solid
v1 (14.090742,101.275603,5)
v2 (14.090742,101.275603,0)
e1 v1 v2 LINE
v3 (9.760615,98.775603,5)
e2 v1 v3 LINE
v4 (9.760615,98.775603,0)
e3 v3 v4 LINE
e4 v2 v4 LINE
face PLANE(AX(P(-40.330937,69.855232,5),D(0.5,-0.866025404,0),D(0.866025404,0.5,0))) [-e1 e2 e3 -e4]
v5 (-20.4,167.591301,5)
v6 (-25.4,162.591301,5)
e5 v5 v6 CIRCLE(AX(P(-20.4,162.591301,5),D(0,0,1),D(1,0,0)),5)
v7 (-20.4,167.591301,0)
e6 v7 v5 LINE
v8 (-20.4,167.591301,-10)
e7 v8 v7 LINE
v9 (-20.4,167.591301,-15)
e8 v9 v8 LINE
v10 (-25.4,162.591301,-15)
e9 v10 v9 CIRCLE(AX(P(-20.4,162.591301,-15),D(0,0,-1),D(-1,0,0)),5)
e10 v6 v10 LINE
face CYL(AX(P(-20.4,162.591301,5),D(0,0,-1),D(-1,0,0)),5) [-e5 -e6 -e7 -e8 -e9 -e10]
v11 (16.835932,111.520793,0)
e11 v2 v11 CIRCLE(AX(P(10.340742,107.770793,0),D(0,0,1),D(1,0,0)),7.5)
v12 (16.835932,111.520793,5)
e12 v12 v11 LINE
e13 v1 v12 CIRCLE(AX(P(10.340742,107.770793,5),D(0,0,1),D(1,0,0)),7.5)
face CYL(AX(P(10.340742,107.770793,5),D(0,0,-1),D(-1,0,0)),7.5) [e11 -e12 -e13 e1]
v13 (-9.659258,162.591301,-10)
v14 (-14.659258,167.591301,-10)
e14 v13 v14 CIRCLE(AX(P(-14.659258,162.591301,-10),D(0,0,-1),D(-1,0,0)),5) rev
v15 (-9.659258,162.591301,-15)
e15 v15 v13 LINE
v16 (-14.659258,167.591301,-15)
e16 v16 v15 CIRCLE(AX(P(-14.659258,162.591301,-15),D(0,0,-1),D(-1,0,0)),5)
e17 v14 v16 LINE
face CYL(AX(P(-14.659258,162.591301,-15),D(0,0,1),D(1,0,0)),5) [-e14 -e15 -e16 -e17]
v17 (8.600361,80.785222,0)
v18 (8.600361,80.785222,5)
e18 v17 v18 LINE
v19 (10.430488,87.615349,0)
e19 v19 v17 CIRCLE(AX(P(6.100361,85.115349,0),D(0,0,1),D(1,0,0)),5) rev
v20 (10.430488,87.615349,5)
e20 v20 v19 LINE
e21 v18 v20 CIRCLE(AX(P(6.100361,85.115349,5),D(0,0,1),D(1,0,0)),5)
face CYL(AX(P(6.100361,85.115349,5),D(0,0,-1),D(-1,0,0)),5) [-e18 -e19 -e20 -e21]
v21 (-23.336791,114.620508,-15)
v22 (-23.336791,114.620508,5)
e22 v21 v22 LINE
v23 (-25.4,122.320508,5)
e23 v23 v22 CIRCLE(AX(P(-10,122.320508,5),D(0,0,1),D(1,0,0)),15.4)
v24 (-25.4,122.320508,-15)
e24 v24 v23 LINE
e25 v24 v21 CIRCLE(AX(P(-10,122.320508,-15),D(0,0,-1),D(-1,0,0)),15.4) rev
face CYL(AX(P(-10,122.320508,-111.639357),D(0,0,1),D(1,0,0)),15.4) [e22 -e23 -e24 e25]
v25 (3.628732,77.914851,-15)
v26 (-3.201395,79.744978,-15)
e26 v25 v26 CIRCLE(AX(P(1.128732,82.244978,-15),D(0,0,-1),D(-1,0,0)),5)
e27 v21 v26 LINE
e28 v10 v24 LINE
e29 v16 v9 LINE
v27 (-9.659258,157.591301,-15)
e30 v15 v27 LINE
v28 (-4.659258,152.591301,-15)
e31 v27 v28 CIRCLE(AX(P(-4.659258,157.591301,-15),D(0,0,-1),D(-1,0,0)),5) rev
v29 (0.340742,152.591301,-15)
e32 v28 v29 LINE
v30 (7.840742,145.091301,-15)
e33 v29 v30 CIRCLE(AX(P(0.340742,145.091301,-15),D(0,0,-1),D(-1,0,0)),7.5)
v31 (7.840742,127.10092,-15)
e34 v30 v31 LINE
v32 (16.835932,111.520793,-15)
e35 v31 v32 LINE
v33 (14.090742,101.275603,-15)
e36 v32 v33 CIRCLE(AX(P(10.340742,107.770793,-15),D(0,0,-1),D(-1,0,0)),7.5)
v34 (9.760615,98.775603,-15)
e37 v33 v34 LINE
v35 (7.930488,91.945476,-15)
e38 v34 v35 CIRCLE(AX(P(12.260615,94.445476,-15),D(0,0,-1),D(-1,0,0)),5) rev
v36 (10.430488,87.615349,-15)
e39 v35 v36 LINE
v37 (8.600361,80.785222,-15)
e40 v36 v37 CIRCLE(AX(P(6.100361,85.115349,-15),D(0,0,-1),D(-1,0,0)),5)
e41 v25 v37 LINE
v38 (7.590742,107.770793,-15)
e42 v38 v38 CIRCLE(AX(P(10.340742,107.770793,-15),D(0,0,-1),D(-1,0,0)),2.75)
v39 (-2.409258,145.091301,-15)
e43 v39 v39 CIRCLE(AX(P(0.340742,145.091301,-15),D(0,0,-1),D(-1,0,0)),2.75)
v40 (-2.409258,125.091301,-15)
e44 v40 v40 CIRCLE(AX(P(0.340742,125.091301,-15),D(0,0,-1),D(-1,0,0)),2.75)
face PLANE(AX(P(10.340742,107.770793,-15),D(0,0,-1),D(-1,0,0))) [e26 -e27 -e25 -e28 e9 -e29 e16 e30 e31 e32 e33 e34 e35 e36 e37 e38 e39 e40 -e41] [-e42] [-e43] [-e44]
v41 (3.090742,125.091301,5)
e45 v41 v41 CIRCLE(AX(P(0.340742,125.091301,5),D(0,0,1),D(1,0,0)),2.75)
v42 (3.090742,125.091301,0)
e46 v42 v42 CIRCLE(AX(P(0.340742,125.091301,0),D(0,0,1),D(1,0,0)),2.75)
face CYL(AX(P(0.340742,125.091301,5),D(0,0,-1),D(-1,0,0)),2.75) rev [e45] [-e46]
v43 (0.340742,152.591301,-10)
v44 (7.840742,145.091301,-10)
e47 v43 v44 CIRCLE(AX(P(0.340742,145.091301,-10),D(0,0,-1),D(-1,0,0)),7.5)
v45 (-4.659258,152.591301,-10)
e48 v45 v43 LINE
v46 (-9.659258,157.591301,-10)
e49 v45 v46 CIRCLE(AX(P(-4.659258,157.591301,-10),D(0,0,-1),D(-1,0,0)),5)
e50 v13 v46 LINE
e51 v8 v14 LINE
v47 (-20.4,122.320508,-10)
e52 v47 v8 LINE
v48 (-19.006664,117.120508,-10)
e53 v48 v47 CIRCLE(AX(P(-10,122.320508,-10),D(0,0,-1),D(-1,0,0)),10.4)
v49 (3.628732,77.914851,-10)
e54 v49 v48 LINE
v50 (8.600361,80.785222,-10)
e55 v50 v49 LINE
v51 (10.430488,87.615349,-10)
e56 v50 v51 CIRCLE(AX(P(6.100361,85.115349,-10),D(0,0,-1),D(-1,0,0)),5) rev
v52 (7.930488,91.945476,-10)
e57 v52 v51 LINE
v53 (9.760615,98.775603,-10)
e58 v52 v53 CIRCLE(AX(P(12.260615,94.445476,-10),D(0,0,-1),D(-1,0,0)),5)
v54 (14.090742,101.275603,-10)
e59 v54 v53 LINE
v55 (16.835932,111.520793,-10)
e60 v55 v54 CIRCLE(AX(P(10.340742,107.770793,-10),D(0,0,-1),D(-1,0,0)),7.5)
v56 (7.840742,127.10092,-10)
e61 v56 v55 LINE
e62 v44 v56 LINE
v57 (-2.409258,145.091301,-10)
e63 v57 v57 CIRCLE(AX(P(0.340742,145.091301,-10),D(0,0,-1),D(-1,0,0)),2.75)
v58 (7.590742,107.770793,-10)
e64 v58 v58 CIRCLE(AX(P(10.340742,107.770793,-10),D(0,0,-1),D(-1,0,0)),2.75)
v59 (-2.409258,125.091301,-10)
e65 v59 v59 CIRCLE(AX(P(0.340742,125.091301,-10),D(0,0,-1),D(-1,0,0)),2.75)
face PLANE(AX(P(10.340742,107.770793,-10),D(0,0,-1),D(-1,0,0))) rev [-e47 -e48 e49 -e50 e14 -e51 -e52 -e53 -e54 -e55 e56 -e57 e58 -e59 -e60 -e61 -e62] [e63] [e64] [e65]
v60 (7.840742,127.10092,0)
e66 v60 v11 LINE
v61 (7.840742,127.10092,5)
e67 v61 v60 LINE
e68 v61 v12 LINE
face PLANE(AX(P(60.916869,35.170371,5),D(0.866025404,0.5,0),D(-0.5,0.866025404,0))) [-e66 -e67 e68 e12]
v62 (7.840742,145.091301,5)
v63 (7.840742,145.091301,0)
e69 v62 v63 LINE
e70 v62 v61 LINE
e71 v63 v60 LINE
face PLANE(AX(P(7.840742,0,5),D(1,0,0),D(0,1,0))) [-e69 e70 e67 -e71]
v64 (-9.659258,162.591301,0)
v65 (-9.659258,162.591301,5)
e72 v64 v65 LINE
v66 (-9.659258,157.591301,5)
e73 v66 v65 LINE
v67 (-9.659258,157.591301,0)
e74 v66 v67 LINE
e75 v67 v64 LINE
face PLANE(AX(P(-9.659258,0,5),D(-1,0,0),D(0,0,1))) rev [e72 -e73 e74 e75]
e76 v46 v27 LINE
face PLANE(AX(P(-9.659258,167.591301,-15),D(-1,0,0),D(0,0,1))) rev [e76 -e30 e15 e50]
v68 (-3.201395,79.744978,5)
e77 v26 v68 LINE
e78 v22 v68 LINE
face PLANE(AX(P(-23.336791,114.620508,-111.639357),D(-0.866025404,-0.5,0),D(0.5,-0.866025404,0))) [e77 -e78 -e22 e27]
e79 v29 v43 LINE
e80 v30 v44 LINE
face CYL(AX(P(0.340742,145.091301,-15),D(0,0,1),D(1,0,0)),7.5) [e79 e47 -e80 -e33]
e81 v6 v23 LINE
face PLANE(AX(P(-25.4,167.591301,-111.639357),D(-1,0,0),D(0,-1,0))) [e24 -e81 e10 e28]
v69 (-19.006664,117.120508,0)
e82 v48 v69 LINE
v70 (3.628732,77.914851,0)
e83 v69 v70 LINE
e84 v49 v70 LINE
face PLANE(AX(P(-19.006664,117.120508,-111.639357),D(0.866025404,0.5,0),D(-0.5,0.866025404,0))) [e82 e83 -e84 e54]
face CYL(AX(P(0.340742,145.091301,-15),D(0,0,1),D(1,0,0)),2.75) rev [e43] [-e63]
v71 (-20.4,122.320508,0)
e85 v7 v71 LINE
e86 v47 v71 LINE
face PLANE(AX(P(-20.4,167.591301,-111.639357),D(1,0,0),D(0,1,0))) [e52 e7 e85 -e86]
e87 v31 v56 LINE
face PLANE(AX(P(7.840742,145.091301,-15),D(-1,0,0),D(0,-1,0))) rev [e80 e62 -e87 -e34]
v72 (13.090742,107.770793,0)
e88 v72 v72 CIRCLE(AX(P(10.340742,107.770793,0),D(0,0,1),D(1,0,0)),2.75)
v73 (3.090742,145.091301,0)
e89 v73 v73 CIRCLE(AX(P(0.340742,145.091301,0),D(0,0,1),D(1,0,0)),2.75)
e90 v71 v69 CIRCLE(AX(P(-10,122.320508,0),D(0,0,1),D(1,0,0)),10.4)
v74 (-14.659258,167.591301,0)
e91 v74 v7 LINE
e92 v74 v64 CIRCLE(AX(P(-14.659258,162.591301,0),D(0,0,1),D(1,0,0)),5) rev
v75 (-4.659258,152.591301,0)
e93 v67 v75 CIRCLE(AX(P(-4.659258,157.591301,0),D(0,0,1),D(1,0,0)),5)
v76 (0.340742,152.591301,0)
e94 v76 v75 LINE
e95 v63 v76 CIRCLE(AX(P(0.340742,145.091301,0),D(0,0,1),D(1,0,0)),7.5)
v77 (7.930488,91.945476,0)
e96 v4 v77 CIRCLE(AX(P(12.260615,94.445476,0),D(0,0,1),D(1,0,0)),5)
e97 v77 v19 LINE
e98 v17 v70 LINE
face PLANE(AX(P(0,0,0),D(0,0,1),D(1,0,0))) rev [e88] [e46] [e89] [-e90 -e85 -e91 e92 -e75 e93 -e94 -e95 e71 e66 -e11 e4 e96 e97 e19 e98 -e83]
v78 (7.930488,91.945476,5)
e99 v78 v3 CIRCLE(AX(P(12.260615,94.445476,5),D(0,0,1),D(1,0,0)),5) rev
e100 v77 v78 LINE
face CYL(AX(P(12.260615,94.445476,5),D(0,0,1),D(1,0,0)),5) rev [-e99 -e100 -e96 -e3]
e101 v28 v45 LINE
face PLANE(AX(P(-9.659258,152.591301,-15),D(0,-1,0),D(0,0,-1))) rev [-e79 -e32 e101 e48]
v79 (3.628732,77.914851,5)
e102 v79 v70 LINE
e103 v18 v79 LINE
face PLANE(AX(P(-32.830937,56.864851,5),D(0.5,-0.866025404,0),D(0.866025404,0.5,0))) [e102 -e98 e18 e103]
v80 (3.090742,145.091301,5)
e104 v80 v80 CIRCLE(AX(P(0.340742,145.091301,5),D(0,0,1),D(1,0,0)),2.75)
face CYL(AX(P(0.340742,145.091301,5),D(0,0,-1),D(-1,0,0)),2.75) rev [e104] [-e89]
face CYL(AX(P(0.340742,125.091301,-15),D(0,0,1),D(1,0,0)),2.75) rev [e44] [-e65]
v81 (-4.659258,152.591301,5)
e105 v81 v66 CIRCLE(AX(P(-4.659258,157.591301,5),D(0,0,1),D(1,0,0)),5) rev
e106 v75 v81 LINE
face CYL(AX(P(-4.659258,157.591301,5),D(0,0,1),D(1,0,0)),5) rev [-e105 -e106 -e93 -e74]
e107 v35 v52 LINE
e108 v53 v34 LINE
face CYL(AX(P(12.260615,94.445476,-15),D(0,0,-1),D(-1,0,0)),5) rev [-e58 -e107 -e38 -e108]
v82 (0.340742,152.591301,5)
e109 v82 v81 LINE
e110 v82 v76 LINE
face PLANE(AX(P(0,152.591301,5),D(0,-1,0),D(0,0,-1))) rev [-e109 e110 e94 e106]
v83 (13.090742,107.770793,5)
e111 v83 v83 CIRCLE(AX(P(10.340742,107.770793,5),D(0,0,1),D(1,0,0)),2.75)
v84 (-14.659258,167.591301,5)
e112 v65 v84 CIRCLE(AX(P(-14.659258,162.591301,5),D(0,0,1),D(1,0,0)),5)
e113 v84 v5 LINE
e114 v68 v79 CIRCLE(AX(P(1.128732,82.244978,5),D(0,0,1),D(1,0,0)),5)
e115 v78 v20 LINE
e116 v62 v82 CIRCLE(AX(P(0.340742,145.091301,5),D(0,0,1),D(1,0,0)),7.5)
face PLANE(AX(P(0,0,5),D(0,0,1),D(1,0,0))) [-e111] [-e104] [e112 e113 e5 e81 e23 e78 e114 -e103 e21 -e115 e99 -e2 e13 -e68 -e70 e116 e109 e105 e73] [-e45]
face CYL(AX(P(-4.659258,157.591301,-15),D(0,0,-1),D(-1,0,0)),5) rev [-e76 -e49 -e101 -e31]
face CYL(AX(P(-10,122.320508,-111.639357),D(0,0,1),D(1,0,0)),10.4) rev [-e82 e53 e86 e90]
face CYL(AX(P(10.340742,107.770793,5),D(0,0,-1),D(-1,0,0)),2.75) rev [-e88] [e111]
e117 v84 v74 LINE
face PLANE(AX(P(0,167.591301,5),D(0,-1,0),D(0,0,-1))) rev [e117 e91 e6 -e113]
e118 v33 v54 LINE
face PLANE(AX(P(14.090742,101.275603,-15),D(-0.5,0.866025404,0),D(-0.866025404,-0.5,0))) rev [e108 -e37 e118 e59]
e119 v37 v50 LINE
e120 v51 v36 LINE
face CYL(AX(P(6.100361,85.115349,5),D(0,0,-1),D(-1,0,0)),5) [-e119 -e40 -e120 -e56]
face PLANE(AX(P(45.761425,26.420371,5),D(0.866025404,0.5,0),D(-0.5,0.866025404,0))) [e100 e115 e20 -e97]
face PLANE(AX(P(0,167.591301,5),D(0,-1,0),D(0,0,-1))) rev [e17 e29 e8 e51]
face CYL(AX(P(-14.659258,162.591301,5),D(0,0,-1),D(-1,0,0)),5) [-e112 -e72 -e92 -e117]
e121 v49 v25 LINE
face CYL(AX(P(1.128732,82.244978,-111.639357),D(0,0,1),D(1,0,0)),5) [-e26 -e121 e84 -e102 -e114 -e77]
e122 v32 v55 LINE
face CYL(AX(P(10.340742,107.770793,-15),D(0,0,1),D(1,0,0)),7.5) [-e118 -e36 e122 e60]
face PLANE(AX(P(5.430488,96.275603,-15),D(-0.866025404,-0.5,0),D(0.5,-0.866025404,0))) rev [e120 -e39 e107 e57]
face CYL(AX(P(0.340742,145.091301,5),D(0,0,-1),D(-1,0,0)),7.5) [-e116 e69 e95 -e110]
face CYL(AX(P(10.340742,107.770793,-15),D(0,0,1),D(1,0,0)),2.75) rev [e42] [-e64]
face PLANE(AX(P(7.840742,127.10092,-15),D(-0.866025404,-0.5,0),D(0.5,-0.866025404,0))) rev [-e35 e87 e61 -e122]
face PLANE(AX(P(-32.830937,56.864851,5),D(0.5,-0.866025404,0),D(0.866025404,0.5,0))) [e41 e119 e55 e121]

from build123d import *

# Parameters (mm, degrees)
SKETCH1_R           = 2.75
BOSS_EXTRUDE1_DEPTH = 5
SKETCH2_R           = 2.75
BOSS_EXTRUDE2_DEPTH = 5
BOSS_EXTRUDE3_START = -20
BOSS_EXTRUDE3_DEPTH = 20
FILLET1_R           = 5


with BuildPart() as part:
    # Sketch1 → Boss-Extrude1 (new body)
    with BuildSketch(Plane.XY):
        with BuildLine():
            ThreePointArc((7.840741737, 145.091301473), (5.644042596, 150.394602332), (0.340741737, 152.591301473))
            Line((0.340741737, 152.591301473), (-9.659258263, 152.591301473))
            Line((-9.659258263, 152.591301473), (-9.659258263, 167.591301473))
            Line((-9.659258263, 167.591301473), (-20.400000003, 167.591301473))
            Line((-20.400000003, 167.591301473), (-20.4, 122.320508076))
            ThreePointArc((-20.4, 122.320508076), (-20.045628593, 119.628790007), (-19.006664199, 117.120508076))
            Line((-19.006664199, 117.120508076), (3.628732497, 77.914850942))
            Line((3.628732497, 77.914850942), (12.930487699, 83.285221812))
            Line((12.930487699, 83.285221812), (5.430487699, 96.275602869))
            Line((5.430487699, 96.275602869), (14.090741737, 101.275602869))
            ThreePointArc((14.090741737, 101.275602869), (17.585185434, 105.829650559), (16.835932265, 111.520793398))
            Line((16.835932265, 111.520793398), (7.840741737, 127.100920417))
            Line((7.840741737, 127.100920417), (7.840741737, 145.091301473))
        make_face()
        with Locations((10.340741737, 107.770793398)):
            Circle(SKETCH1_R, mode=Mode.SUBTRACT)
        with Locations((0.340741737, 125.091301473)):
            Circle(SKETCH1_R, mode=Mode.SUBTRACT)
        with Locations((0.340741737, 145.091301473)):
            Circle(SKETCH1_R, mode=Mode.SUBTRACT)
    extrude(amount=BOSS_EXTRUDE1_DEPTH)



with BuildPart() as body_2:
    # Sketch2 → Boss-Extrude2 (new body)
    with BuildSketch(Plane(origin=(0, 0, -10), x_dir=(-1, 0, 0), z_dir=(0, 0, -1))):
        with BuildLine():
            Line((-14.090741737, 101.275602869), (-5.430487699, 96.275602869))
            Line((-5.430487699, 96.275602869), (-12.930487699, 83.285221812))
            Line((-12.930487699, 83.285221812), (-3.628732497, 77.914850942))
            Line((-3.628732497, 77.914850942), (19.006664199, 117.120508076))
            ThreePointArc((19.006664199, 117.120508076), (20.045628593, 119.628790007), (20.4, 122.320508076))
            Line((20.4, 122.320508076), (20.400000003, 167.591301473))
            Line((20.400000003, 167.591301473), (9.659258263, 167.591301473))
            Line((9.659258263, 167.591301473), (9.659258263, 152.591301473))
            Line((9.659258263, 152.591301473), (-0.340741737, 152.591301473))
            ThreePointArc((-0.340741737, 152.591301473), (-5.644042596, 150.394602332), (-7.840741737, 145.091301473))
            Line((-7.840741737, 145.091301473), (-7.840741737, 127.100920417))
            Line((-7.840741737, 127.100920417), (-16.835932265, 111.520793398))
            ThreePointArc((-16.835932265, 111.520793398), (-17.585185434, 105.829650559), (-14.090741737, 101.275602869))
        make_face()
        with Locations(Location((-10.340741737, 107.770793398, 0), (0, 0, 180))):
            Circle(SKETCH2_R, mode=Mode.SUBTRACT)
        with Locations(Location((-0.340741737, 125.091301473, 0), (0, 0, 180))):
            Circle(SKETCH2_R, mode=Mode.SUBTRACT)
        with Locations(Location((-0.340741737, 145.091301473, 0), (0, 0, 180))):
            Circle(SKETCH2_R, mode=Mode.SUBTRACT)
    extrude(amount=BOSS_EXTRUDE2_DEPTH)


with BuildPart() as part_1:
    add(part.part)

    add(body_2.part)  # Boss-Extrude3 merges body 2
    # Sketch3 → Boss-Extrude3 (add)
    with BuildSketch(Plane.XY.offset(5).offset(BOSS_EXTRUDE3_START)):
        with BuildLine():
            Line((-0.701394522, 75.414850943), (3.628732497, 77.914850942))
            Line((3.628732497, 77.914850942), (-19.006664199, 117.120508076))
            ThreePointArc((-19.006664199, 117.120508076), (-20.045628593, 119.628790007), (-20.4, 122.320508076))
            Line((-20.4, 122.320508076), (-20.400000003, 167.591301473))
            Line((-20.400000003, 167.591301473), (-25.400000003, 167.591301473))
            Line((-25.400000003, 167.591301473), (-25.4, 122.320508076))
            ThreePointArc((-25.4, 122.320508076), (-24.875257725, 118.334694781), (-23.336791218, 114.620508076))
            Line((-23.336791218, 114.620508076), (-0.701394522, 75.414850943))
        make_face()
    extrude(amount=BOSS_EXTRUDE3_DEPTH)

    # Fillet1
    fillet1_edges = [part_1.edges().sort_by_distance(p)[0] for p in [
        (5.430487699, 96.275602869, 2.5),
        (12.930487699, 83.285221812, 2.5),
        (-9.659258263, 167.591301473, 2.5),
        (-9.659258263, 152.591301473, 2.5),
        (-0.701394522, 75.414850943, -5),
        (-25.400000003, 167.591301473, -5),
        (5.430487699, 96.275602869, -12.5),
        (12.930487699, 83.285221812, -12.5),
        (-9.659258263, 167.591301473, -12.5),
        (-9.659258263, 152.591301473, -12.5),
    ]]
    fillet(fillet1_edges, radius=FILLET1_R - 0.0001)  # a hair under: the kernel refuses the full size


solid = part_1.part
